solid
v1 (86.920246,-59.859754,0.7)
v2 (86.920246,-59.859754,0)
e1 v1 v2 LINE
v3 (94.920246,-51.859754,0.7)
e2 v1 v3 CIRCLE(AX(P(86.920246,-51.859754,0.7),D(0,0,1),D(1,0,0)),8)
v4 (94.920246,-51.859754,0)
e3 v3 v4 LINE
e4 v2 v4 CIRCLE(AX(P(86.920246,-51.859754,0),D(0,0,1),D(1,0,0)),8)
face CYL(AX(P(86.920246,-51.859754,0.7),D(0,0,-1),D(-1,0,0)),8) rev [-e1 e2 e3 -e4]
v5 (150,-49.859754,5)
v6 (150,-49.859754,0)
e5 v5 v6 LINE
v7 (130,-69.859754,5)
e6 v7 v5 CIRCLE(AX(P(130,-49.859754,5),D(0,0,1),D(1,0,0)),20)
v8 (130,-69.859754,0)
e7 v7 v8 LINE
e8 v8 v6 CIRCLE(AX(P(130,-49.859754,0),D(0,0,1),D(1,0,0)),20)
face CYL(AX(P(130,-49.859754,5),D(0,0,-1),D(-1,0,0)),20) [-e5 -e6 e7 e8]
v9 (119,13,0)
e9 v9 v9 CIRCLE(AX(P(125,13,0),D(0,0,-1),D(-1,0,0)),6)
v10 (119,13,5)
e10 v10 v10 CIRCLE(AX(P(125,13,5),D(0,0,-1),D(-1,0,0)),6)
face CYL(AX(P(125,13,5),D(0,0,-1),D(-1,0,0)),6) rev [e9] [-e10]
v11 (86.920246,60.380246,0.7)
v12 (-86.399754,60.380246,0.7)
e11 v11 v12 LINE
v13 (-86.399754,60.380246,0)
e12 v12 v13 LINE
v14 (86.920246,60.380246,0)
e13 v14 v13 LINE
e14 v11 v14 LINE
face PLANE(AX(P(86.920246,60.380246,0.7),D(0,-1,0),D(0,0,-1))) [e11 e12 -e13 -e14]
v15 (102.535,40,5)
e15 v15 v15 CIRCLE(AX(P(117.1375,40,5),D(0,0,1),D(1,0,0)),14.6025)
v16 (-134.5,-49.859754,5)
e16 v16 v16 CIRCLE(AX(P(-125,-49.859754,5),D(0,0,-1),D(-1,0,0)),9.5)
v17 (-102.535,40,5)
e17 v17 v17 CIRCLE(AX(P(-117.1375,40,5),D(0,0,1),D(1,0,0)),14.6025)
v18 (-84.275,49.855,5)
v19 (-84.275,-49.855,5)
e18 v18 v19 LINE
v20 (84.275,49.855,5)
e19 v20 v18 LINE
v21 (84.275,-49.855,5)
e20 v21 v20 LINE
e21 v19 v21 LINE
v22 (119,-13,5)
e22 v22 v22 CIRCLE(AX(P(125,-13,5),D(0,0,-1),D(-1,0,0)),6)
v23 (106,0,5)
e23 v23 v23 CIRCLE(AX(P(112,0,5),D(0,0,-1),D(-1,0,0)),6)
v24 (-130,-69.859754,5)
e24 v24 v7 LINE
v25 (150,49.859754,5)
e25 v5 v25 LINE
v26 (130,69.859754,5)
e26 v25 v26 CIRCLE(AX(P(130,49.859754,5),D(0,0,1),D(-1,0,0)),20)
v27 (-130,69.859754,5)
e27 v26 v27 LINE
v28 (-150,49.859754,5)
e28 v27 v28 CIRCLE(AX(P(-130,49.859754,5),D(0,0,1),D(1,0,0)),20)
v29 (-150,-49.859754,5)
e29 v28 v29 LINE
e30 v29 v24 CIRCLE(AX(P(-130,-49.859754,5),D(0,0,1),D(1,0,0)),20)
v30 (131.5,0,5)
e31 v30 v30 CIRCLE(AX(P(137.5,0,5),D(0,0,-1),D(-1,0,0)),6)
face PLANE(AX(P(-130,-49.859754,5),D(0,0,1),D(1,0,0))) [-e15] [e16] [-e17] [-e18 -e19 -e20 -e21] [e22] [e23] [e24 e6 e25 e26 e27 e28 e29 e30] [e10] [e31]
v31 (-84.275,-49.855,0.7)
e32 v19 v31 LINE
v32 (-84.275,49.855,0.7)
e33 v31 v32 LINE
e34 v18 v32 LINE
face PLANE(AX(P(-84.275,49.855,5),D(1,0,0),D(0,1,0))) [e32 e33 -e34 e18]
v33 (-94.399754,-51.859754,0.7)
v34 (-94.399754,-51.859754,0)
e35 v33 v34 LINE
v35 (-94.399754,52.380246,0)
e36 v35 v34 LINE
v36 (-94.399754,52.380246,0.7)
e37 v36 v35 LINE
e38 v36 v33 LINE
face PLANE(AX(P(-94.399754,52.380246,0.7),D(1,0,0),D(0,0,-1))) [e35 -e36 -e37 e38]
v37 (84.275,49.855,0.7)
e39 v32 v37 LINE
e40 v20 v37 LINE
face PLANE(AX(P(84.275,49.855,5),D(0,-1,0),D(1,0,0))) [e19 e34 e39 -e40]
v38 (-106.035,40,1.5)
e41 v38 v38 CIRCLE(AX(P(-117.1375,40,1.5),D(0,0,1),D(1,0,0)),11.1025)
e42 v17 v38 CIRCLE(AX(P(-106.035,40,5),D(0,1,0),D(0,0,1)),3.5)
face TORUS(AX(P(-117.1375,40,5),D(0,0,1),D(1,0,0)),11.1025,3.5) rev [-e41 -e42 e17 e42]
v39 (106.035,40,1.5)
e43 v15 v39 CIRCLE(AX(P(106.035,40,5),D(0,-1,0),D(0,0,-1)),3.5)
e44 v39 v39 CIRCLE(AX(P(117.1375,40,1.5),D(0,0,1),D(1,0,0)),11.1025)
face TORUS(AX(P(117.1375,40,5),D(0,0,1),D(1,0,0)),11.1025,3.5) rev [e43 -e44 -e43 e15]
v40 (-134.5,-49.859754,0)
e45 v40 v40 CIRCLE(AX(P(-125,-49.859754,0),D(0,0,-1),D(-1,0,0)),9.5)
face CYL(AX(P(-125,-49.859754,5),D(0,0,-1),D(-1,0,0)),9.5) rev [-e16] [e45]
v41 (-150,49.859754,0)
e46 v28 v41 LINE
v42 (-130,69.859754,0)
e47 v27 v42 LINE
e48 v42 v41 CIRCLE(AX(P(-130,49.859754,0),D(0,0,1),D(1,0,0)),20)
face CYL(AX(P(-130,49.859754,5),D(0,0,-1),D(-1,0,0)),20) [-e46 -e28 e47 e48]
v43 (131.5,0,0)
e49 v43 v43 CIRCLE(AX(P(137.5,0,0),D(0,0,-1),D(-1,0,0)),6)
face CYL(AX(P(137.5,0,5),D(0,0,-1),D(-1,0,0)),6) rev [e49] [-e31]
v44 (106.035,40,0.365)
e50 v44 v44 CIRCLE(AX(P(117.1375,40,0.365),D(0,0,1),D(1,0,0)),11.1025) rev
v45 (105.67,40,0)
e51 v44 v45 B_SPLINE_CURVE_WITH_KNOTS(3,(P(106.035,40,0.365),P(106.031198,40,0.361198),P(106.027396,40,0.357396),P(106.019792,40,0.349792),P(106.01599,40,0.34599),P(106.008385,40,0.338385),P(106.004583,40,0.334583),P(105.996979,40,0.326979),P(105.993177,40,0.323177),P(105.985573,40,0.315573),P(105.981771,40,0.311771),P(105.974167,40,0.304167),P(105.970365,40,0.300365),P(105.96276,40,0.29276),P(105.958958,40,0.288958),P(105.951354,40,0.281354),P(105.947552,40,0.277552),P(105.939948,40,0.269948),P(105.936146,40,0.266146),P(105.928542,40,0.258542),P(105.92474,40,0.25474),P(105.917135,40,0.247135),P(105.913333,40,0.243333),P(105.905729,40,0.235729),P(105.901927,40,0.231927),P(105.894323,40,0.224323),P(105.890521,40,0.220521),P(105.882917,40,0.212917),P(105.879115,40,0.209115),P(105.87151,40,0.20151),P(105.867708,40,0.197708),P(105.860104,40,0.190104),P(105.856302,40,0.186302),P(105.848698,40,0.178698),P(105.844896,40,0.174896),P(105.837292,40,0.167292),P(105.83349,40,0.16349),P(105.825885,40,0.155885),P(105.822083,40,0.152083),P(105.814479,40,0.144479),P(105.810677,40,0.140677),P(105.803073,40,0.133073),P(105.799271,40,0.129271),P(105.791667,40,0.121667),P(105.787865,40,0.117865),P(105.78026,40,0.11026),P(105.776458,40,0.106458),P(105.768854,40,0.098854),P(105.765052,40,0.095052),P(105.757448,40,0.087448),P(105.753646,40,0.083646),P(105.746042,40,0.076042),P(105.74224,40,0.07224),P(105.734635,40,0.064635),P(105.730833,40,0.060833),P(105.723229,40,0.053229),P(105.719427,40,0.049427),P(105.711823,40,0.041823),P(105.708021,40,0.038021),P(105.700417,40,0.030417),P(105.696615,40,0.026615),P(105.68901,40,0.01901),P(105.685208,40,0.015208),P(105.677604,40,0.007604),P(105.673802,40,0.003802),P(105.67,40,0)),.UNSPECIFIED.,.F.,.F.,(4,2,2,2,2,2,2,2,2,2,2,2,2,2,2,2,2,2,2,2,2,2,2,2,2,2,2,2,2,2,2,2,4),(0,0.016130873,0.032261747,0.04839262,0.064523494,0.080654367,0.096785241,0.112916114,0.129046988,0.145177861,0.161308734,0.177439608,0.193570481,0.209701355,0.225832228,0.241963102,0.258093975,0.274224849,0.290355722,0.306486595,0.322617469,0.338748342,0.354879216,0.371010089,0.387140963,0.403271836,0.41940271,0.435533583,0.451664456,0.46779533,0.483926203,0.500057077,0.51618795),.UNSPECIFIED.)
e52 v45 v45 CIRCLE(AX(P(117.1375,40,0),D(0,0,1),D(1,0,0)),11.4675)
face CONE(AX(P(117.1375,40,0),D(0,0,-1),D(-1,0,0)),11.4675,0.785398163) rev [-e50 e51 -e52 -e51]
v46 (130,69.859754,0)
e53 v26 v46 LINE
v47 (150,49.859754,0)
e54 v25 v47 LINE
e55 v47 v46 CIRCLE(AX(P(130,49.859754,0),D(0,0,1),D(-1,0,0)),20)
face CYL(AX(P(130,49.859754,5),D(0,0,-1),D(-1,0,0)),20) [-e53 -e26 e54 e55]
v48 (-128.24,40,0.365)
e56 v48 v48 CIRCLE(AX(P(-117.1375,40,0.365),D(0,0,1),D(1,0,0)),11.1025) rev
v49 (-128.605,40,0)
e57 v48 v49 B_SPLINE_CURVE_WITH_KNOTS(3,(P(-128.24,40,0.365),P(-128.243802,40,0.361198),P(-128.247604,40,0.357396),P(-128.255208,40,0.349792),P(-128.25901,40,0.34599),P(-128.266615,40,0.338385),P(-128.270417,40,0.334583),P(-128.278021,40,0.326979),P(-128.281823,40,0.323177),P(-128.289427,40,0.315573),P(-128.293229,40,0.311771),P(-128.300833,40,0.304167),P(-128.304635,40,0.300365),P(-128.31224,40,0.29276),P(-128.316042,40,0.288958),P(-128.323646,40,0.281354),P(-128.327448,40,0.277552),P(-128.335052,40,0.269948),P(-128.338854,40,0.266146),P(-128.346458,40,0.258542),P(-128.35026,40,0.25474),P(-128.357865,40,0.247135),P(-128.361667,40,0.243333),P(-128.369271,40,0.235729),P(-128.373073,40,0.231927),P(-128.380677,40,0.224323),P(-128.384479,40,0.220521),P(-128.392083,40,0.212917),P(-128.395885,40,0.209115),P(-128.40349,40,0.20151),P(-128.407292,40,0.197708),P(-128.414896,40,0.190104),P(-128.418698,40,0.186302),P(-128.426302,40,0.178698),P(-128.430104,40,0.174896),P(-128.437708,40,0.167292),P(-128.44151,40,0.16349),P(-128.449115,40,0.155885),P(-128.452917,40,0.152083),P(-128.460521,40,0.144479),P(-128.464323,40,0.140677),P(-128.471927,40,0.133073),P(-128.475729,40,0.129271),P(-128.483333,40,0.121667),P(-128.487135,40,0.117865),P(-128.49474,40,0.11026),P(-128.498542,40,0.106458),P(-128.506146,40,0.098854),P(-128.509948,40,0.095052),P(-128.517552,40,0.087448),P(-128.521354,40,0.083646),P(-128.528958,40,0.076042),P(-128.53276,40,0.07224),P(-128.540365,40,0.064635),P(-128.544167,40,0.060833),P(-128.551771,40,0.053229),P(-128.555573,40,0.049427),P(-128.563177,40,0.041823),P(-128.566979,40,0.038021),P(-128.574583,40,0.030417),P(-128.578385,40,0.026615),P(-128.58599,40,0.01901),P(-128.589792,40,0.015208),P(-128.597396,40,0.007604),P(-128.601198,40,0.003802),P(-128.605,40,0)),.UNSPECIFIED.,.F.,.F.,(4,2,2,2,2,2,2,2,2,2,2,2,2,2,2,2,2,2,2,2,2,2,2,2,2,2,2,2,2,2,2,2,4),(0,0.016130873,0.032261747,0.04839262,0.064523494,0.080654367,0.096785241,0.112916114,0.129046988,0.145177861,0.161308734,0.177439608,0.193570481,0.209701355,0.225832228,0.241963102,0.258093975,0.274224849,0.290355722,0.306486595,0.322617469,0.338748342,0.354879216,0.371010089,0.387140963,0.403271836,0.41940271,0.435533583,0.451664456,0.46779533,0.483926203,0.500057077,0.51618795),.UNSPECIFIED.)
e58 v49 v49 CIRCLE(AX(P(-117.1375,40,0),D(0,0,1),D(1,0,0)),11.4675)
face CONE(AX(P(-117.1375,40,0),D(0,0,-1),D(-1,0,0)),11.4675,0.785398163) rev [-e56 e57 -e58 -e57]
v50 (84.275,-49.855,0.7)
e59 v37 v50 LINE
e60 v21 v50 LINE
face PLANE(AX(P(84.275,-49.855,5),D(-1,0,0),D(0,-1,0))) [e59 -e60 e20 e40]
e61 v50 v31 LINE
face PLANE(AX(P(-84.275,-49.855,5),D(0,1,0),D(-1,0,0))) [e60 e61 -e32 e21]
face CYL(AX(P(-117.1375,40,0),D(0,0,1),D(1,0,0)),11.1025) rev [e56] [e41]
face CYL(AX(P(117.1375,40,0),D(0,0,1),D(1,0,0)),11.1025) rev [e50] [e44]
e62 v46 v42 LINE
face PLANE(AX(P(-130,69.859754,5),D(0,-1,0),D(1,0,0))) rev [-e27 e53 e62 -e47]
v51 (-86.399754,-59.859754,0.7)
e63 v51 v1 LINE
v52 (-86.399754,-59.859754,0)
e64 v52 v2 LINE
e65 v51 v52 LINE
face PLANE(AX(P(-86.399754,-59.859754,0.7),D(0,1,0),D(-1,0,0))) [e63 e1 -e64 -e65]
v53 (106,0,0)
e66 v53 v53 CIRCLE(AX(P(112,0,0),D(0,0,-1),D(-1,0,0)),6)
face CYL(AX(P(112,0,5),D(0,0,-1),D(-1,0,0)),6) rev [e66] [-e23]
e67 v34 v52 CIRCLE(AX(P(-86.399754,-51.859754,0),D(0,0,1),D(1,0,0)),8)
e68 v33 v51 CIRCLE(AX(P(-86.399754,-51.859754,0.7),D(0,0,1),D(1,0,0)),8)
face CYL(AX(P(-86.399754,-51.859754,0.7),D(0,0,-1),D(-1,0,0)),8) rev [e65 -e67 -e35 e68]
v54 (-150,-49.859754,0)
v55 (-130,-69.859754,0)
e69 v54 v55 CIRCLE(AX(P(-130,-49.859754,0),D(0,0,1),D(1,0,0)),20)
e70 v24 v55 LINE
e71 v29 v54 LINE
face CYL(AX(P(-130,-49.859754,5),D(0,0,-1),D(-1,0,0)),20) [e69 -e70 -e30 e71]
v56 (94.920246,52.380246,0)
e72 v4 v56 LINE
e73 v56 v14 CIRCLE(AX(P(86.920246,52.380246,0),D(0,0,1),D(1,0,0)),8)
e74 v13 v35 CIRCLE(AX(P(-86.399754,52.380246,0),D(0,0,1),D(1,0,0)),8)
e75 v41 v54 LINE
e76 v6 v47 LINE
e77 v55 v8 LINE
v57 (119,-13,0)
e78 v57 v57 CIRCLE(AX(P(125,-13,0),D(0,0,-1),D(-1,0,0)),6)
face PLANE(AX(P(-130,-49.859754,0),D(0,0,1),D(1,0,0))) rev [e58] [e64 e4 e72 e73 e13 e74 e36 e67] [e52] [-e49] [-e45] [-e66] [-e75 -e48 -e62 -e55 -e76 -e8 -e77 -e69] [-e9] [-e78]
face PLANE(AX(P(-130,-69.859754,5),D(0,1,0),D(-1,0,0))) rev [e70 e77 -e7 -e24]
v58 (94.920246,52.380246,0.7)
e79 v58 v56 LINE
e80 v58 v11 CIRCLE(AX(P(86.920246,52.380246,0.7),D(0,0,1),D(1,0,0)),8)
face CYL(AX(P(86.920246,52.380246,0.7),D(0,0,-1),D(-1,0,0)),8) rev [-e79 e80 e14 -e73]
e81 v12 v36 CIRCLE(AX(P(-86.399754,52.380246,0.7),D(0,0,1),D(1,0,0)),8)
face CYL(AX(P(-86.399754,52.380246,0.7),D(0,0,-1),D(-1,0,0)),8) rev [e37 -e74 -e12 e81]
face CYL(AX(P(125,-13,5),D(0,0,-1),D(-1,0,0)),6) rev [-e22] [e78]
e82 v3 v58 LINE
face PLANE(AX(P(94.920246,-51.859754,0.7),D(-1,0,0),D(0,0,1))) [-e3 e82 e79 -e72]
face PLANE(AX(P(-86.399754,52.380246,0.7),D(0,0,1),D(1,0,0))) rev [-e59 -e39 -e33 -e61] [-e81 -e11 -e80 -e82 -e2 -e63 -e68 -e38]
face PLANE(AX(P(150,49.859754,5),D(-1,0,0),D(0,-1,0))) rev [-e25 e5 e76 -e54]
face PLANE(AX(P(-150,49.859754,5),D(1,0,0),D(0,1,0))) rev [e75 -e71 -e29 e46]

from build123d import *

# Parameters (mm, degrees)
BOSS_EXTRUDE1_DEPTH = 5
CUT_EXTRUDE1_DEPTH  = 0.7
SKETCH7_W           = 168.55
SKETCH7_H           = 99.71
CUT_EXTRUDE2_DEPTH  = 166.54571941
SKETCH8_R           = 11.1025
CUT_EXTRUDE3_DEPTH  = 166.54571941
CHAMFER1_SIZE       = 0.365
SKETCH58_R          = 6
CUT_EXTRUDE4_DEPTH  = 166.54571941
SKETCH59_R          = 9.5
CUT_EXTRUDE5_DEPTH  = 166.54571941


# Read off the part's stored shape, not the designer's step: Cut-Sweep1, Cut-Sweep2
with BuildPart() as part:
    # Sketch1 → Boss-Extrude1 (new body)
    with BuildSketch(Plane.XY):
        with BuildLine():
            Line((-130, 69.8597539), (130, 69.8597539))
            ThreePointArc((130, 69.8597539), (144.142135624, 64.001889524), (150, 49.8597539))
            Line((150, 49.8597539), (150, -49.8597539))
            ThreePointArc((150, -49.8597539), (144.142135624, -64.001889524), (130, -69.8597539))
            Line((130, -69.8597539), (-130, -69.8597539))
            ThreePointArc((-130, -69.8597539), (-144.142135624, -64.001889524), (-150, -49.8597539))
            Line((-150, -49.8597539), (-150, 49.8597539))
            ThreePointArc((-150, 49.8597539), (-144.142135624, 64.001889524), (-130, 69.8597539))
        make_face()
    extrude(amount=BOSS_EXTRUDE1_DEPTH)

    # Sketch5 → Cut-Extrude1 (cut)
    with BuildSketch(Plane.XY):
        with BuildLine():
            Line((-94.3997539, 52.3802461), (-94.3997539, -51.8597539))
            ThreePointArc((-94.3997539, -51.8597539), (-92.05660815, -57.51660815), (-86.3997539, -59.8597539))
            Line((-86.3997539, -59.8597539), (86.9202461, -59.8597539))
            ThreePointArc((86.9202461, -59.8597539), (92.577100349, -57.51660815), (94.9202461, -51.8597539))
            Line((94.9202461, -51.8597539), (94.9202461, 52.3802461))
            ThreePointArc((94.9202461, 52.3802461), (92.577100349, 58.037100349), (86.9202461, 60.3802461))
            Line((86.9202461, 60.3802461), (-86.3997539, 60.3802461))
            ThreePointArc((-86.3997539, 60.3802461), (-92.05660815, 58.037100349), (-94.3997539, 52.3802461))
        make_face()
    extrude(amount=CUT_EXTRUDE1_DEPTH, mode=Mode.SUBTRACT)

    # Sketch7 → Cut-Extrude2 (cut, through all)
    with BuildSketch(Plane.XY):
        Rectangle(SKETCH7_W, SKETCH7_H)
    extrude(amount=CUT_EXTRUDE2_DEPTH, mode=Mode.SUBTRACT)

    # Sketch8 → Cut-Extrude3 (cut, through all)
    with BuildSketch(Plane.XY.offset(5)):
        with Locations((-117.1375, 40)):
            Circle(SKETCH8_R)
        with Locations(Location((117.1375, 40, 0), (0, 0, 180))):
            Circle(SKETCH8_R)
    extrude(amount=-CUT_EXTRUDE3_DEPTH, mode=Mode.SUBTRACT)

    # Chamfer1
    chamfer1_edges = [part.edges().sort_by_distance(p)[0] for p in [
        (-128.24, 40, 0),
        (128.24, 40, 0),
    ]]
    chamfer(chamfer1_edges, length=CHAMFER1_SIZE)

    # Cut-Sweep1 outline → Cut-Sweep1 (revolve, cut)
    with BuildSketch(Plane(origin=(-117.1375, 40, 0), x_dir=(1, 0, 0), z_dir=(0, -1, 0))):
        with BuildLine():
            Line((11.1025, 5), (11.1025, 1.5))
            ThreePointArc((11.1025, 1.5), (13.577373734, 2.525126266), (14.6025, 5))
            Line((14.6025, 5), (11.1025, 5))
        make_face()
    revolve(axis=Axis((-117.1375, 40, 0), (0, 0, 1)), mode=Mode.SUBTRACT)

    # Cut-Sweep2 outline → Cut-Sweep2 (revolve, cut)
    with BuildSketch(Plane(origin=(117.1375, 40, 0), x_dir=(1, 0, 0), z_dir=(0, -1, 0))):
        with BuildLine():
            Line((11.1025, 5), (11.1025, 1.5))
            ThreePointArc((11.1025, 1.5), (13.577373734, 2.525126266), (14.6025, 5))
            Line((14.6025, 5), (11.1025, 5))
        make_face()
    revolve(axis=Axis((117.1375, 40, 0), (0, 0, 1)), mode=Mode.SUBTRACT)

    # Sketch58 → Cut-Extrude4 (cut, through all)
    with BuildSketch(Plane(origin=(0, 0, 0), x_dir=(-1, 0, 0), z_dir=(0, 0, -1))):
        with Locations((-125, 13)):
            Circle(SKETCH58_R)
        with Locations((-112, 0)):
            Circle(SKETCH58_R)
        with Locations((-125, -13)):
            Circle(SKETCH58_R)
        with Locations((-137.5, 0)):
            Circle(SKETCH58_R)
    extrude(amount=-CUT_EXTRUDE4_DEPTH, mode=Mode.SUBTRACT)

    # Sketch59 → Cut-Extrude5 (cut, through all)
    with BuildSketch(Plane(origin=(0, 0, 0), x_dir=(-1, 0, 0), z_dir=(0, 0, -1))):
        with Locations((125, -49.8597539)):
            Circle(SKETCH59_R)
    extrude(amount=-CUT_EXTRUDE5_DEPTH, mode=Mode.SUBTRACT)


solid = part.part
